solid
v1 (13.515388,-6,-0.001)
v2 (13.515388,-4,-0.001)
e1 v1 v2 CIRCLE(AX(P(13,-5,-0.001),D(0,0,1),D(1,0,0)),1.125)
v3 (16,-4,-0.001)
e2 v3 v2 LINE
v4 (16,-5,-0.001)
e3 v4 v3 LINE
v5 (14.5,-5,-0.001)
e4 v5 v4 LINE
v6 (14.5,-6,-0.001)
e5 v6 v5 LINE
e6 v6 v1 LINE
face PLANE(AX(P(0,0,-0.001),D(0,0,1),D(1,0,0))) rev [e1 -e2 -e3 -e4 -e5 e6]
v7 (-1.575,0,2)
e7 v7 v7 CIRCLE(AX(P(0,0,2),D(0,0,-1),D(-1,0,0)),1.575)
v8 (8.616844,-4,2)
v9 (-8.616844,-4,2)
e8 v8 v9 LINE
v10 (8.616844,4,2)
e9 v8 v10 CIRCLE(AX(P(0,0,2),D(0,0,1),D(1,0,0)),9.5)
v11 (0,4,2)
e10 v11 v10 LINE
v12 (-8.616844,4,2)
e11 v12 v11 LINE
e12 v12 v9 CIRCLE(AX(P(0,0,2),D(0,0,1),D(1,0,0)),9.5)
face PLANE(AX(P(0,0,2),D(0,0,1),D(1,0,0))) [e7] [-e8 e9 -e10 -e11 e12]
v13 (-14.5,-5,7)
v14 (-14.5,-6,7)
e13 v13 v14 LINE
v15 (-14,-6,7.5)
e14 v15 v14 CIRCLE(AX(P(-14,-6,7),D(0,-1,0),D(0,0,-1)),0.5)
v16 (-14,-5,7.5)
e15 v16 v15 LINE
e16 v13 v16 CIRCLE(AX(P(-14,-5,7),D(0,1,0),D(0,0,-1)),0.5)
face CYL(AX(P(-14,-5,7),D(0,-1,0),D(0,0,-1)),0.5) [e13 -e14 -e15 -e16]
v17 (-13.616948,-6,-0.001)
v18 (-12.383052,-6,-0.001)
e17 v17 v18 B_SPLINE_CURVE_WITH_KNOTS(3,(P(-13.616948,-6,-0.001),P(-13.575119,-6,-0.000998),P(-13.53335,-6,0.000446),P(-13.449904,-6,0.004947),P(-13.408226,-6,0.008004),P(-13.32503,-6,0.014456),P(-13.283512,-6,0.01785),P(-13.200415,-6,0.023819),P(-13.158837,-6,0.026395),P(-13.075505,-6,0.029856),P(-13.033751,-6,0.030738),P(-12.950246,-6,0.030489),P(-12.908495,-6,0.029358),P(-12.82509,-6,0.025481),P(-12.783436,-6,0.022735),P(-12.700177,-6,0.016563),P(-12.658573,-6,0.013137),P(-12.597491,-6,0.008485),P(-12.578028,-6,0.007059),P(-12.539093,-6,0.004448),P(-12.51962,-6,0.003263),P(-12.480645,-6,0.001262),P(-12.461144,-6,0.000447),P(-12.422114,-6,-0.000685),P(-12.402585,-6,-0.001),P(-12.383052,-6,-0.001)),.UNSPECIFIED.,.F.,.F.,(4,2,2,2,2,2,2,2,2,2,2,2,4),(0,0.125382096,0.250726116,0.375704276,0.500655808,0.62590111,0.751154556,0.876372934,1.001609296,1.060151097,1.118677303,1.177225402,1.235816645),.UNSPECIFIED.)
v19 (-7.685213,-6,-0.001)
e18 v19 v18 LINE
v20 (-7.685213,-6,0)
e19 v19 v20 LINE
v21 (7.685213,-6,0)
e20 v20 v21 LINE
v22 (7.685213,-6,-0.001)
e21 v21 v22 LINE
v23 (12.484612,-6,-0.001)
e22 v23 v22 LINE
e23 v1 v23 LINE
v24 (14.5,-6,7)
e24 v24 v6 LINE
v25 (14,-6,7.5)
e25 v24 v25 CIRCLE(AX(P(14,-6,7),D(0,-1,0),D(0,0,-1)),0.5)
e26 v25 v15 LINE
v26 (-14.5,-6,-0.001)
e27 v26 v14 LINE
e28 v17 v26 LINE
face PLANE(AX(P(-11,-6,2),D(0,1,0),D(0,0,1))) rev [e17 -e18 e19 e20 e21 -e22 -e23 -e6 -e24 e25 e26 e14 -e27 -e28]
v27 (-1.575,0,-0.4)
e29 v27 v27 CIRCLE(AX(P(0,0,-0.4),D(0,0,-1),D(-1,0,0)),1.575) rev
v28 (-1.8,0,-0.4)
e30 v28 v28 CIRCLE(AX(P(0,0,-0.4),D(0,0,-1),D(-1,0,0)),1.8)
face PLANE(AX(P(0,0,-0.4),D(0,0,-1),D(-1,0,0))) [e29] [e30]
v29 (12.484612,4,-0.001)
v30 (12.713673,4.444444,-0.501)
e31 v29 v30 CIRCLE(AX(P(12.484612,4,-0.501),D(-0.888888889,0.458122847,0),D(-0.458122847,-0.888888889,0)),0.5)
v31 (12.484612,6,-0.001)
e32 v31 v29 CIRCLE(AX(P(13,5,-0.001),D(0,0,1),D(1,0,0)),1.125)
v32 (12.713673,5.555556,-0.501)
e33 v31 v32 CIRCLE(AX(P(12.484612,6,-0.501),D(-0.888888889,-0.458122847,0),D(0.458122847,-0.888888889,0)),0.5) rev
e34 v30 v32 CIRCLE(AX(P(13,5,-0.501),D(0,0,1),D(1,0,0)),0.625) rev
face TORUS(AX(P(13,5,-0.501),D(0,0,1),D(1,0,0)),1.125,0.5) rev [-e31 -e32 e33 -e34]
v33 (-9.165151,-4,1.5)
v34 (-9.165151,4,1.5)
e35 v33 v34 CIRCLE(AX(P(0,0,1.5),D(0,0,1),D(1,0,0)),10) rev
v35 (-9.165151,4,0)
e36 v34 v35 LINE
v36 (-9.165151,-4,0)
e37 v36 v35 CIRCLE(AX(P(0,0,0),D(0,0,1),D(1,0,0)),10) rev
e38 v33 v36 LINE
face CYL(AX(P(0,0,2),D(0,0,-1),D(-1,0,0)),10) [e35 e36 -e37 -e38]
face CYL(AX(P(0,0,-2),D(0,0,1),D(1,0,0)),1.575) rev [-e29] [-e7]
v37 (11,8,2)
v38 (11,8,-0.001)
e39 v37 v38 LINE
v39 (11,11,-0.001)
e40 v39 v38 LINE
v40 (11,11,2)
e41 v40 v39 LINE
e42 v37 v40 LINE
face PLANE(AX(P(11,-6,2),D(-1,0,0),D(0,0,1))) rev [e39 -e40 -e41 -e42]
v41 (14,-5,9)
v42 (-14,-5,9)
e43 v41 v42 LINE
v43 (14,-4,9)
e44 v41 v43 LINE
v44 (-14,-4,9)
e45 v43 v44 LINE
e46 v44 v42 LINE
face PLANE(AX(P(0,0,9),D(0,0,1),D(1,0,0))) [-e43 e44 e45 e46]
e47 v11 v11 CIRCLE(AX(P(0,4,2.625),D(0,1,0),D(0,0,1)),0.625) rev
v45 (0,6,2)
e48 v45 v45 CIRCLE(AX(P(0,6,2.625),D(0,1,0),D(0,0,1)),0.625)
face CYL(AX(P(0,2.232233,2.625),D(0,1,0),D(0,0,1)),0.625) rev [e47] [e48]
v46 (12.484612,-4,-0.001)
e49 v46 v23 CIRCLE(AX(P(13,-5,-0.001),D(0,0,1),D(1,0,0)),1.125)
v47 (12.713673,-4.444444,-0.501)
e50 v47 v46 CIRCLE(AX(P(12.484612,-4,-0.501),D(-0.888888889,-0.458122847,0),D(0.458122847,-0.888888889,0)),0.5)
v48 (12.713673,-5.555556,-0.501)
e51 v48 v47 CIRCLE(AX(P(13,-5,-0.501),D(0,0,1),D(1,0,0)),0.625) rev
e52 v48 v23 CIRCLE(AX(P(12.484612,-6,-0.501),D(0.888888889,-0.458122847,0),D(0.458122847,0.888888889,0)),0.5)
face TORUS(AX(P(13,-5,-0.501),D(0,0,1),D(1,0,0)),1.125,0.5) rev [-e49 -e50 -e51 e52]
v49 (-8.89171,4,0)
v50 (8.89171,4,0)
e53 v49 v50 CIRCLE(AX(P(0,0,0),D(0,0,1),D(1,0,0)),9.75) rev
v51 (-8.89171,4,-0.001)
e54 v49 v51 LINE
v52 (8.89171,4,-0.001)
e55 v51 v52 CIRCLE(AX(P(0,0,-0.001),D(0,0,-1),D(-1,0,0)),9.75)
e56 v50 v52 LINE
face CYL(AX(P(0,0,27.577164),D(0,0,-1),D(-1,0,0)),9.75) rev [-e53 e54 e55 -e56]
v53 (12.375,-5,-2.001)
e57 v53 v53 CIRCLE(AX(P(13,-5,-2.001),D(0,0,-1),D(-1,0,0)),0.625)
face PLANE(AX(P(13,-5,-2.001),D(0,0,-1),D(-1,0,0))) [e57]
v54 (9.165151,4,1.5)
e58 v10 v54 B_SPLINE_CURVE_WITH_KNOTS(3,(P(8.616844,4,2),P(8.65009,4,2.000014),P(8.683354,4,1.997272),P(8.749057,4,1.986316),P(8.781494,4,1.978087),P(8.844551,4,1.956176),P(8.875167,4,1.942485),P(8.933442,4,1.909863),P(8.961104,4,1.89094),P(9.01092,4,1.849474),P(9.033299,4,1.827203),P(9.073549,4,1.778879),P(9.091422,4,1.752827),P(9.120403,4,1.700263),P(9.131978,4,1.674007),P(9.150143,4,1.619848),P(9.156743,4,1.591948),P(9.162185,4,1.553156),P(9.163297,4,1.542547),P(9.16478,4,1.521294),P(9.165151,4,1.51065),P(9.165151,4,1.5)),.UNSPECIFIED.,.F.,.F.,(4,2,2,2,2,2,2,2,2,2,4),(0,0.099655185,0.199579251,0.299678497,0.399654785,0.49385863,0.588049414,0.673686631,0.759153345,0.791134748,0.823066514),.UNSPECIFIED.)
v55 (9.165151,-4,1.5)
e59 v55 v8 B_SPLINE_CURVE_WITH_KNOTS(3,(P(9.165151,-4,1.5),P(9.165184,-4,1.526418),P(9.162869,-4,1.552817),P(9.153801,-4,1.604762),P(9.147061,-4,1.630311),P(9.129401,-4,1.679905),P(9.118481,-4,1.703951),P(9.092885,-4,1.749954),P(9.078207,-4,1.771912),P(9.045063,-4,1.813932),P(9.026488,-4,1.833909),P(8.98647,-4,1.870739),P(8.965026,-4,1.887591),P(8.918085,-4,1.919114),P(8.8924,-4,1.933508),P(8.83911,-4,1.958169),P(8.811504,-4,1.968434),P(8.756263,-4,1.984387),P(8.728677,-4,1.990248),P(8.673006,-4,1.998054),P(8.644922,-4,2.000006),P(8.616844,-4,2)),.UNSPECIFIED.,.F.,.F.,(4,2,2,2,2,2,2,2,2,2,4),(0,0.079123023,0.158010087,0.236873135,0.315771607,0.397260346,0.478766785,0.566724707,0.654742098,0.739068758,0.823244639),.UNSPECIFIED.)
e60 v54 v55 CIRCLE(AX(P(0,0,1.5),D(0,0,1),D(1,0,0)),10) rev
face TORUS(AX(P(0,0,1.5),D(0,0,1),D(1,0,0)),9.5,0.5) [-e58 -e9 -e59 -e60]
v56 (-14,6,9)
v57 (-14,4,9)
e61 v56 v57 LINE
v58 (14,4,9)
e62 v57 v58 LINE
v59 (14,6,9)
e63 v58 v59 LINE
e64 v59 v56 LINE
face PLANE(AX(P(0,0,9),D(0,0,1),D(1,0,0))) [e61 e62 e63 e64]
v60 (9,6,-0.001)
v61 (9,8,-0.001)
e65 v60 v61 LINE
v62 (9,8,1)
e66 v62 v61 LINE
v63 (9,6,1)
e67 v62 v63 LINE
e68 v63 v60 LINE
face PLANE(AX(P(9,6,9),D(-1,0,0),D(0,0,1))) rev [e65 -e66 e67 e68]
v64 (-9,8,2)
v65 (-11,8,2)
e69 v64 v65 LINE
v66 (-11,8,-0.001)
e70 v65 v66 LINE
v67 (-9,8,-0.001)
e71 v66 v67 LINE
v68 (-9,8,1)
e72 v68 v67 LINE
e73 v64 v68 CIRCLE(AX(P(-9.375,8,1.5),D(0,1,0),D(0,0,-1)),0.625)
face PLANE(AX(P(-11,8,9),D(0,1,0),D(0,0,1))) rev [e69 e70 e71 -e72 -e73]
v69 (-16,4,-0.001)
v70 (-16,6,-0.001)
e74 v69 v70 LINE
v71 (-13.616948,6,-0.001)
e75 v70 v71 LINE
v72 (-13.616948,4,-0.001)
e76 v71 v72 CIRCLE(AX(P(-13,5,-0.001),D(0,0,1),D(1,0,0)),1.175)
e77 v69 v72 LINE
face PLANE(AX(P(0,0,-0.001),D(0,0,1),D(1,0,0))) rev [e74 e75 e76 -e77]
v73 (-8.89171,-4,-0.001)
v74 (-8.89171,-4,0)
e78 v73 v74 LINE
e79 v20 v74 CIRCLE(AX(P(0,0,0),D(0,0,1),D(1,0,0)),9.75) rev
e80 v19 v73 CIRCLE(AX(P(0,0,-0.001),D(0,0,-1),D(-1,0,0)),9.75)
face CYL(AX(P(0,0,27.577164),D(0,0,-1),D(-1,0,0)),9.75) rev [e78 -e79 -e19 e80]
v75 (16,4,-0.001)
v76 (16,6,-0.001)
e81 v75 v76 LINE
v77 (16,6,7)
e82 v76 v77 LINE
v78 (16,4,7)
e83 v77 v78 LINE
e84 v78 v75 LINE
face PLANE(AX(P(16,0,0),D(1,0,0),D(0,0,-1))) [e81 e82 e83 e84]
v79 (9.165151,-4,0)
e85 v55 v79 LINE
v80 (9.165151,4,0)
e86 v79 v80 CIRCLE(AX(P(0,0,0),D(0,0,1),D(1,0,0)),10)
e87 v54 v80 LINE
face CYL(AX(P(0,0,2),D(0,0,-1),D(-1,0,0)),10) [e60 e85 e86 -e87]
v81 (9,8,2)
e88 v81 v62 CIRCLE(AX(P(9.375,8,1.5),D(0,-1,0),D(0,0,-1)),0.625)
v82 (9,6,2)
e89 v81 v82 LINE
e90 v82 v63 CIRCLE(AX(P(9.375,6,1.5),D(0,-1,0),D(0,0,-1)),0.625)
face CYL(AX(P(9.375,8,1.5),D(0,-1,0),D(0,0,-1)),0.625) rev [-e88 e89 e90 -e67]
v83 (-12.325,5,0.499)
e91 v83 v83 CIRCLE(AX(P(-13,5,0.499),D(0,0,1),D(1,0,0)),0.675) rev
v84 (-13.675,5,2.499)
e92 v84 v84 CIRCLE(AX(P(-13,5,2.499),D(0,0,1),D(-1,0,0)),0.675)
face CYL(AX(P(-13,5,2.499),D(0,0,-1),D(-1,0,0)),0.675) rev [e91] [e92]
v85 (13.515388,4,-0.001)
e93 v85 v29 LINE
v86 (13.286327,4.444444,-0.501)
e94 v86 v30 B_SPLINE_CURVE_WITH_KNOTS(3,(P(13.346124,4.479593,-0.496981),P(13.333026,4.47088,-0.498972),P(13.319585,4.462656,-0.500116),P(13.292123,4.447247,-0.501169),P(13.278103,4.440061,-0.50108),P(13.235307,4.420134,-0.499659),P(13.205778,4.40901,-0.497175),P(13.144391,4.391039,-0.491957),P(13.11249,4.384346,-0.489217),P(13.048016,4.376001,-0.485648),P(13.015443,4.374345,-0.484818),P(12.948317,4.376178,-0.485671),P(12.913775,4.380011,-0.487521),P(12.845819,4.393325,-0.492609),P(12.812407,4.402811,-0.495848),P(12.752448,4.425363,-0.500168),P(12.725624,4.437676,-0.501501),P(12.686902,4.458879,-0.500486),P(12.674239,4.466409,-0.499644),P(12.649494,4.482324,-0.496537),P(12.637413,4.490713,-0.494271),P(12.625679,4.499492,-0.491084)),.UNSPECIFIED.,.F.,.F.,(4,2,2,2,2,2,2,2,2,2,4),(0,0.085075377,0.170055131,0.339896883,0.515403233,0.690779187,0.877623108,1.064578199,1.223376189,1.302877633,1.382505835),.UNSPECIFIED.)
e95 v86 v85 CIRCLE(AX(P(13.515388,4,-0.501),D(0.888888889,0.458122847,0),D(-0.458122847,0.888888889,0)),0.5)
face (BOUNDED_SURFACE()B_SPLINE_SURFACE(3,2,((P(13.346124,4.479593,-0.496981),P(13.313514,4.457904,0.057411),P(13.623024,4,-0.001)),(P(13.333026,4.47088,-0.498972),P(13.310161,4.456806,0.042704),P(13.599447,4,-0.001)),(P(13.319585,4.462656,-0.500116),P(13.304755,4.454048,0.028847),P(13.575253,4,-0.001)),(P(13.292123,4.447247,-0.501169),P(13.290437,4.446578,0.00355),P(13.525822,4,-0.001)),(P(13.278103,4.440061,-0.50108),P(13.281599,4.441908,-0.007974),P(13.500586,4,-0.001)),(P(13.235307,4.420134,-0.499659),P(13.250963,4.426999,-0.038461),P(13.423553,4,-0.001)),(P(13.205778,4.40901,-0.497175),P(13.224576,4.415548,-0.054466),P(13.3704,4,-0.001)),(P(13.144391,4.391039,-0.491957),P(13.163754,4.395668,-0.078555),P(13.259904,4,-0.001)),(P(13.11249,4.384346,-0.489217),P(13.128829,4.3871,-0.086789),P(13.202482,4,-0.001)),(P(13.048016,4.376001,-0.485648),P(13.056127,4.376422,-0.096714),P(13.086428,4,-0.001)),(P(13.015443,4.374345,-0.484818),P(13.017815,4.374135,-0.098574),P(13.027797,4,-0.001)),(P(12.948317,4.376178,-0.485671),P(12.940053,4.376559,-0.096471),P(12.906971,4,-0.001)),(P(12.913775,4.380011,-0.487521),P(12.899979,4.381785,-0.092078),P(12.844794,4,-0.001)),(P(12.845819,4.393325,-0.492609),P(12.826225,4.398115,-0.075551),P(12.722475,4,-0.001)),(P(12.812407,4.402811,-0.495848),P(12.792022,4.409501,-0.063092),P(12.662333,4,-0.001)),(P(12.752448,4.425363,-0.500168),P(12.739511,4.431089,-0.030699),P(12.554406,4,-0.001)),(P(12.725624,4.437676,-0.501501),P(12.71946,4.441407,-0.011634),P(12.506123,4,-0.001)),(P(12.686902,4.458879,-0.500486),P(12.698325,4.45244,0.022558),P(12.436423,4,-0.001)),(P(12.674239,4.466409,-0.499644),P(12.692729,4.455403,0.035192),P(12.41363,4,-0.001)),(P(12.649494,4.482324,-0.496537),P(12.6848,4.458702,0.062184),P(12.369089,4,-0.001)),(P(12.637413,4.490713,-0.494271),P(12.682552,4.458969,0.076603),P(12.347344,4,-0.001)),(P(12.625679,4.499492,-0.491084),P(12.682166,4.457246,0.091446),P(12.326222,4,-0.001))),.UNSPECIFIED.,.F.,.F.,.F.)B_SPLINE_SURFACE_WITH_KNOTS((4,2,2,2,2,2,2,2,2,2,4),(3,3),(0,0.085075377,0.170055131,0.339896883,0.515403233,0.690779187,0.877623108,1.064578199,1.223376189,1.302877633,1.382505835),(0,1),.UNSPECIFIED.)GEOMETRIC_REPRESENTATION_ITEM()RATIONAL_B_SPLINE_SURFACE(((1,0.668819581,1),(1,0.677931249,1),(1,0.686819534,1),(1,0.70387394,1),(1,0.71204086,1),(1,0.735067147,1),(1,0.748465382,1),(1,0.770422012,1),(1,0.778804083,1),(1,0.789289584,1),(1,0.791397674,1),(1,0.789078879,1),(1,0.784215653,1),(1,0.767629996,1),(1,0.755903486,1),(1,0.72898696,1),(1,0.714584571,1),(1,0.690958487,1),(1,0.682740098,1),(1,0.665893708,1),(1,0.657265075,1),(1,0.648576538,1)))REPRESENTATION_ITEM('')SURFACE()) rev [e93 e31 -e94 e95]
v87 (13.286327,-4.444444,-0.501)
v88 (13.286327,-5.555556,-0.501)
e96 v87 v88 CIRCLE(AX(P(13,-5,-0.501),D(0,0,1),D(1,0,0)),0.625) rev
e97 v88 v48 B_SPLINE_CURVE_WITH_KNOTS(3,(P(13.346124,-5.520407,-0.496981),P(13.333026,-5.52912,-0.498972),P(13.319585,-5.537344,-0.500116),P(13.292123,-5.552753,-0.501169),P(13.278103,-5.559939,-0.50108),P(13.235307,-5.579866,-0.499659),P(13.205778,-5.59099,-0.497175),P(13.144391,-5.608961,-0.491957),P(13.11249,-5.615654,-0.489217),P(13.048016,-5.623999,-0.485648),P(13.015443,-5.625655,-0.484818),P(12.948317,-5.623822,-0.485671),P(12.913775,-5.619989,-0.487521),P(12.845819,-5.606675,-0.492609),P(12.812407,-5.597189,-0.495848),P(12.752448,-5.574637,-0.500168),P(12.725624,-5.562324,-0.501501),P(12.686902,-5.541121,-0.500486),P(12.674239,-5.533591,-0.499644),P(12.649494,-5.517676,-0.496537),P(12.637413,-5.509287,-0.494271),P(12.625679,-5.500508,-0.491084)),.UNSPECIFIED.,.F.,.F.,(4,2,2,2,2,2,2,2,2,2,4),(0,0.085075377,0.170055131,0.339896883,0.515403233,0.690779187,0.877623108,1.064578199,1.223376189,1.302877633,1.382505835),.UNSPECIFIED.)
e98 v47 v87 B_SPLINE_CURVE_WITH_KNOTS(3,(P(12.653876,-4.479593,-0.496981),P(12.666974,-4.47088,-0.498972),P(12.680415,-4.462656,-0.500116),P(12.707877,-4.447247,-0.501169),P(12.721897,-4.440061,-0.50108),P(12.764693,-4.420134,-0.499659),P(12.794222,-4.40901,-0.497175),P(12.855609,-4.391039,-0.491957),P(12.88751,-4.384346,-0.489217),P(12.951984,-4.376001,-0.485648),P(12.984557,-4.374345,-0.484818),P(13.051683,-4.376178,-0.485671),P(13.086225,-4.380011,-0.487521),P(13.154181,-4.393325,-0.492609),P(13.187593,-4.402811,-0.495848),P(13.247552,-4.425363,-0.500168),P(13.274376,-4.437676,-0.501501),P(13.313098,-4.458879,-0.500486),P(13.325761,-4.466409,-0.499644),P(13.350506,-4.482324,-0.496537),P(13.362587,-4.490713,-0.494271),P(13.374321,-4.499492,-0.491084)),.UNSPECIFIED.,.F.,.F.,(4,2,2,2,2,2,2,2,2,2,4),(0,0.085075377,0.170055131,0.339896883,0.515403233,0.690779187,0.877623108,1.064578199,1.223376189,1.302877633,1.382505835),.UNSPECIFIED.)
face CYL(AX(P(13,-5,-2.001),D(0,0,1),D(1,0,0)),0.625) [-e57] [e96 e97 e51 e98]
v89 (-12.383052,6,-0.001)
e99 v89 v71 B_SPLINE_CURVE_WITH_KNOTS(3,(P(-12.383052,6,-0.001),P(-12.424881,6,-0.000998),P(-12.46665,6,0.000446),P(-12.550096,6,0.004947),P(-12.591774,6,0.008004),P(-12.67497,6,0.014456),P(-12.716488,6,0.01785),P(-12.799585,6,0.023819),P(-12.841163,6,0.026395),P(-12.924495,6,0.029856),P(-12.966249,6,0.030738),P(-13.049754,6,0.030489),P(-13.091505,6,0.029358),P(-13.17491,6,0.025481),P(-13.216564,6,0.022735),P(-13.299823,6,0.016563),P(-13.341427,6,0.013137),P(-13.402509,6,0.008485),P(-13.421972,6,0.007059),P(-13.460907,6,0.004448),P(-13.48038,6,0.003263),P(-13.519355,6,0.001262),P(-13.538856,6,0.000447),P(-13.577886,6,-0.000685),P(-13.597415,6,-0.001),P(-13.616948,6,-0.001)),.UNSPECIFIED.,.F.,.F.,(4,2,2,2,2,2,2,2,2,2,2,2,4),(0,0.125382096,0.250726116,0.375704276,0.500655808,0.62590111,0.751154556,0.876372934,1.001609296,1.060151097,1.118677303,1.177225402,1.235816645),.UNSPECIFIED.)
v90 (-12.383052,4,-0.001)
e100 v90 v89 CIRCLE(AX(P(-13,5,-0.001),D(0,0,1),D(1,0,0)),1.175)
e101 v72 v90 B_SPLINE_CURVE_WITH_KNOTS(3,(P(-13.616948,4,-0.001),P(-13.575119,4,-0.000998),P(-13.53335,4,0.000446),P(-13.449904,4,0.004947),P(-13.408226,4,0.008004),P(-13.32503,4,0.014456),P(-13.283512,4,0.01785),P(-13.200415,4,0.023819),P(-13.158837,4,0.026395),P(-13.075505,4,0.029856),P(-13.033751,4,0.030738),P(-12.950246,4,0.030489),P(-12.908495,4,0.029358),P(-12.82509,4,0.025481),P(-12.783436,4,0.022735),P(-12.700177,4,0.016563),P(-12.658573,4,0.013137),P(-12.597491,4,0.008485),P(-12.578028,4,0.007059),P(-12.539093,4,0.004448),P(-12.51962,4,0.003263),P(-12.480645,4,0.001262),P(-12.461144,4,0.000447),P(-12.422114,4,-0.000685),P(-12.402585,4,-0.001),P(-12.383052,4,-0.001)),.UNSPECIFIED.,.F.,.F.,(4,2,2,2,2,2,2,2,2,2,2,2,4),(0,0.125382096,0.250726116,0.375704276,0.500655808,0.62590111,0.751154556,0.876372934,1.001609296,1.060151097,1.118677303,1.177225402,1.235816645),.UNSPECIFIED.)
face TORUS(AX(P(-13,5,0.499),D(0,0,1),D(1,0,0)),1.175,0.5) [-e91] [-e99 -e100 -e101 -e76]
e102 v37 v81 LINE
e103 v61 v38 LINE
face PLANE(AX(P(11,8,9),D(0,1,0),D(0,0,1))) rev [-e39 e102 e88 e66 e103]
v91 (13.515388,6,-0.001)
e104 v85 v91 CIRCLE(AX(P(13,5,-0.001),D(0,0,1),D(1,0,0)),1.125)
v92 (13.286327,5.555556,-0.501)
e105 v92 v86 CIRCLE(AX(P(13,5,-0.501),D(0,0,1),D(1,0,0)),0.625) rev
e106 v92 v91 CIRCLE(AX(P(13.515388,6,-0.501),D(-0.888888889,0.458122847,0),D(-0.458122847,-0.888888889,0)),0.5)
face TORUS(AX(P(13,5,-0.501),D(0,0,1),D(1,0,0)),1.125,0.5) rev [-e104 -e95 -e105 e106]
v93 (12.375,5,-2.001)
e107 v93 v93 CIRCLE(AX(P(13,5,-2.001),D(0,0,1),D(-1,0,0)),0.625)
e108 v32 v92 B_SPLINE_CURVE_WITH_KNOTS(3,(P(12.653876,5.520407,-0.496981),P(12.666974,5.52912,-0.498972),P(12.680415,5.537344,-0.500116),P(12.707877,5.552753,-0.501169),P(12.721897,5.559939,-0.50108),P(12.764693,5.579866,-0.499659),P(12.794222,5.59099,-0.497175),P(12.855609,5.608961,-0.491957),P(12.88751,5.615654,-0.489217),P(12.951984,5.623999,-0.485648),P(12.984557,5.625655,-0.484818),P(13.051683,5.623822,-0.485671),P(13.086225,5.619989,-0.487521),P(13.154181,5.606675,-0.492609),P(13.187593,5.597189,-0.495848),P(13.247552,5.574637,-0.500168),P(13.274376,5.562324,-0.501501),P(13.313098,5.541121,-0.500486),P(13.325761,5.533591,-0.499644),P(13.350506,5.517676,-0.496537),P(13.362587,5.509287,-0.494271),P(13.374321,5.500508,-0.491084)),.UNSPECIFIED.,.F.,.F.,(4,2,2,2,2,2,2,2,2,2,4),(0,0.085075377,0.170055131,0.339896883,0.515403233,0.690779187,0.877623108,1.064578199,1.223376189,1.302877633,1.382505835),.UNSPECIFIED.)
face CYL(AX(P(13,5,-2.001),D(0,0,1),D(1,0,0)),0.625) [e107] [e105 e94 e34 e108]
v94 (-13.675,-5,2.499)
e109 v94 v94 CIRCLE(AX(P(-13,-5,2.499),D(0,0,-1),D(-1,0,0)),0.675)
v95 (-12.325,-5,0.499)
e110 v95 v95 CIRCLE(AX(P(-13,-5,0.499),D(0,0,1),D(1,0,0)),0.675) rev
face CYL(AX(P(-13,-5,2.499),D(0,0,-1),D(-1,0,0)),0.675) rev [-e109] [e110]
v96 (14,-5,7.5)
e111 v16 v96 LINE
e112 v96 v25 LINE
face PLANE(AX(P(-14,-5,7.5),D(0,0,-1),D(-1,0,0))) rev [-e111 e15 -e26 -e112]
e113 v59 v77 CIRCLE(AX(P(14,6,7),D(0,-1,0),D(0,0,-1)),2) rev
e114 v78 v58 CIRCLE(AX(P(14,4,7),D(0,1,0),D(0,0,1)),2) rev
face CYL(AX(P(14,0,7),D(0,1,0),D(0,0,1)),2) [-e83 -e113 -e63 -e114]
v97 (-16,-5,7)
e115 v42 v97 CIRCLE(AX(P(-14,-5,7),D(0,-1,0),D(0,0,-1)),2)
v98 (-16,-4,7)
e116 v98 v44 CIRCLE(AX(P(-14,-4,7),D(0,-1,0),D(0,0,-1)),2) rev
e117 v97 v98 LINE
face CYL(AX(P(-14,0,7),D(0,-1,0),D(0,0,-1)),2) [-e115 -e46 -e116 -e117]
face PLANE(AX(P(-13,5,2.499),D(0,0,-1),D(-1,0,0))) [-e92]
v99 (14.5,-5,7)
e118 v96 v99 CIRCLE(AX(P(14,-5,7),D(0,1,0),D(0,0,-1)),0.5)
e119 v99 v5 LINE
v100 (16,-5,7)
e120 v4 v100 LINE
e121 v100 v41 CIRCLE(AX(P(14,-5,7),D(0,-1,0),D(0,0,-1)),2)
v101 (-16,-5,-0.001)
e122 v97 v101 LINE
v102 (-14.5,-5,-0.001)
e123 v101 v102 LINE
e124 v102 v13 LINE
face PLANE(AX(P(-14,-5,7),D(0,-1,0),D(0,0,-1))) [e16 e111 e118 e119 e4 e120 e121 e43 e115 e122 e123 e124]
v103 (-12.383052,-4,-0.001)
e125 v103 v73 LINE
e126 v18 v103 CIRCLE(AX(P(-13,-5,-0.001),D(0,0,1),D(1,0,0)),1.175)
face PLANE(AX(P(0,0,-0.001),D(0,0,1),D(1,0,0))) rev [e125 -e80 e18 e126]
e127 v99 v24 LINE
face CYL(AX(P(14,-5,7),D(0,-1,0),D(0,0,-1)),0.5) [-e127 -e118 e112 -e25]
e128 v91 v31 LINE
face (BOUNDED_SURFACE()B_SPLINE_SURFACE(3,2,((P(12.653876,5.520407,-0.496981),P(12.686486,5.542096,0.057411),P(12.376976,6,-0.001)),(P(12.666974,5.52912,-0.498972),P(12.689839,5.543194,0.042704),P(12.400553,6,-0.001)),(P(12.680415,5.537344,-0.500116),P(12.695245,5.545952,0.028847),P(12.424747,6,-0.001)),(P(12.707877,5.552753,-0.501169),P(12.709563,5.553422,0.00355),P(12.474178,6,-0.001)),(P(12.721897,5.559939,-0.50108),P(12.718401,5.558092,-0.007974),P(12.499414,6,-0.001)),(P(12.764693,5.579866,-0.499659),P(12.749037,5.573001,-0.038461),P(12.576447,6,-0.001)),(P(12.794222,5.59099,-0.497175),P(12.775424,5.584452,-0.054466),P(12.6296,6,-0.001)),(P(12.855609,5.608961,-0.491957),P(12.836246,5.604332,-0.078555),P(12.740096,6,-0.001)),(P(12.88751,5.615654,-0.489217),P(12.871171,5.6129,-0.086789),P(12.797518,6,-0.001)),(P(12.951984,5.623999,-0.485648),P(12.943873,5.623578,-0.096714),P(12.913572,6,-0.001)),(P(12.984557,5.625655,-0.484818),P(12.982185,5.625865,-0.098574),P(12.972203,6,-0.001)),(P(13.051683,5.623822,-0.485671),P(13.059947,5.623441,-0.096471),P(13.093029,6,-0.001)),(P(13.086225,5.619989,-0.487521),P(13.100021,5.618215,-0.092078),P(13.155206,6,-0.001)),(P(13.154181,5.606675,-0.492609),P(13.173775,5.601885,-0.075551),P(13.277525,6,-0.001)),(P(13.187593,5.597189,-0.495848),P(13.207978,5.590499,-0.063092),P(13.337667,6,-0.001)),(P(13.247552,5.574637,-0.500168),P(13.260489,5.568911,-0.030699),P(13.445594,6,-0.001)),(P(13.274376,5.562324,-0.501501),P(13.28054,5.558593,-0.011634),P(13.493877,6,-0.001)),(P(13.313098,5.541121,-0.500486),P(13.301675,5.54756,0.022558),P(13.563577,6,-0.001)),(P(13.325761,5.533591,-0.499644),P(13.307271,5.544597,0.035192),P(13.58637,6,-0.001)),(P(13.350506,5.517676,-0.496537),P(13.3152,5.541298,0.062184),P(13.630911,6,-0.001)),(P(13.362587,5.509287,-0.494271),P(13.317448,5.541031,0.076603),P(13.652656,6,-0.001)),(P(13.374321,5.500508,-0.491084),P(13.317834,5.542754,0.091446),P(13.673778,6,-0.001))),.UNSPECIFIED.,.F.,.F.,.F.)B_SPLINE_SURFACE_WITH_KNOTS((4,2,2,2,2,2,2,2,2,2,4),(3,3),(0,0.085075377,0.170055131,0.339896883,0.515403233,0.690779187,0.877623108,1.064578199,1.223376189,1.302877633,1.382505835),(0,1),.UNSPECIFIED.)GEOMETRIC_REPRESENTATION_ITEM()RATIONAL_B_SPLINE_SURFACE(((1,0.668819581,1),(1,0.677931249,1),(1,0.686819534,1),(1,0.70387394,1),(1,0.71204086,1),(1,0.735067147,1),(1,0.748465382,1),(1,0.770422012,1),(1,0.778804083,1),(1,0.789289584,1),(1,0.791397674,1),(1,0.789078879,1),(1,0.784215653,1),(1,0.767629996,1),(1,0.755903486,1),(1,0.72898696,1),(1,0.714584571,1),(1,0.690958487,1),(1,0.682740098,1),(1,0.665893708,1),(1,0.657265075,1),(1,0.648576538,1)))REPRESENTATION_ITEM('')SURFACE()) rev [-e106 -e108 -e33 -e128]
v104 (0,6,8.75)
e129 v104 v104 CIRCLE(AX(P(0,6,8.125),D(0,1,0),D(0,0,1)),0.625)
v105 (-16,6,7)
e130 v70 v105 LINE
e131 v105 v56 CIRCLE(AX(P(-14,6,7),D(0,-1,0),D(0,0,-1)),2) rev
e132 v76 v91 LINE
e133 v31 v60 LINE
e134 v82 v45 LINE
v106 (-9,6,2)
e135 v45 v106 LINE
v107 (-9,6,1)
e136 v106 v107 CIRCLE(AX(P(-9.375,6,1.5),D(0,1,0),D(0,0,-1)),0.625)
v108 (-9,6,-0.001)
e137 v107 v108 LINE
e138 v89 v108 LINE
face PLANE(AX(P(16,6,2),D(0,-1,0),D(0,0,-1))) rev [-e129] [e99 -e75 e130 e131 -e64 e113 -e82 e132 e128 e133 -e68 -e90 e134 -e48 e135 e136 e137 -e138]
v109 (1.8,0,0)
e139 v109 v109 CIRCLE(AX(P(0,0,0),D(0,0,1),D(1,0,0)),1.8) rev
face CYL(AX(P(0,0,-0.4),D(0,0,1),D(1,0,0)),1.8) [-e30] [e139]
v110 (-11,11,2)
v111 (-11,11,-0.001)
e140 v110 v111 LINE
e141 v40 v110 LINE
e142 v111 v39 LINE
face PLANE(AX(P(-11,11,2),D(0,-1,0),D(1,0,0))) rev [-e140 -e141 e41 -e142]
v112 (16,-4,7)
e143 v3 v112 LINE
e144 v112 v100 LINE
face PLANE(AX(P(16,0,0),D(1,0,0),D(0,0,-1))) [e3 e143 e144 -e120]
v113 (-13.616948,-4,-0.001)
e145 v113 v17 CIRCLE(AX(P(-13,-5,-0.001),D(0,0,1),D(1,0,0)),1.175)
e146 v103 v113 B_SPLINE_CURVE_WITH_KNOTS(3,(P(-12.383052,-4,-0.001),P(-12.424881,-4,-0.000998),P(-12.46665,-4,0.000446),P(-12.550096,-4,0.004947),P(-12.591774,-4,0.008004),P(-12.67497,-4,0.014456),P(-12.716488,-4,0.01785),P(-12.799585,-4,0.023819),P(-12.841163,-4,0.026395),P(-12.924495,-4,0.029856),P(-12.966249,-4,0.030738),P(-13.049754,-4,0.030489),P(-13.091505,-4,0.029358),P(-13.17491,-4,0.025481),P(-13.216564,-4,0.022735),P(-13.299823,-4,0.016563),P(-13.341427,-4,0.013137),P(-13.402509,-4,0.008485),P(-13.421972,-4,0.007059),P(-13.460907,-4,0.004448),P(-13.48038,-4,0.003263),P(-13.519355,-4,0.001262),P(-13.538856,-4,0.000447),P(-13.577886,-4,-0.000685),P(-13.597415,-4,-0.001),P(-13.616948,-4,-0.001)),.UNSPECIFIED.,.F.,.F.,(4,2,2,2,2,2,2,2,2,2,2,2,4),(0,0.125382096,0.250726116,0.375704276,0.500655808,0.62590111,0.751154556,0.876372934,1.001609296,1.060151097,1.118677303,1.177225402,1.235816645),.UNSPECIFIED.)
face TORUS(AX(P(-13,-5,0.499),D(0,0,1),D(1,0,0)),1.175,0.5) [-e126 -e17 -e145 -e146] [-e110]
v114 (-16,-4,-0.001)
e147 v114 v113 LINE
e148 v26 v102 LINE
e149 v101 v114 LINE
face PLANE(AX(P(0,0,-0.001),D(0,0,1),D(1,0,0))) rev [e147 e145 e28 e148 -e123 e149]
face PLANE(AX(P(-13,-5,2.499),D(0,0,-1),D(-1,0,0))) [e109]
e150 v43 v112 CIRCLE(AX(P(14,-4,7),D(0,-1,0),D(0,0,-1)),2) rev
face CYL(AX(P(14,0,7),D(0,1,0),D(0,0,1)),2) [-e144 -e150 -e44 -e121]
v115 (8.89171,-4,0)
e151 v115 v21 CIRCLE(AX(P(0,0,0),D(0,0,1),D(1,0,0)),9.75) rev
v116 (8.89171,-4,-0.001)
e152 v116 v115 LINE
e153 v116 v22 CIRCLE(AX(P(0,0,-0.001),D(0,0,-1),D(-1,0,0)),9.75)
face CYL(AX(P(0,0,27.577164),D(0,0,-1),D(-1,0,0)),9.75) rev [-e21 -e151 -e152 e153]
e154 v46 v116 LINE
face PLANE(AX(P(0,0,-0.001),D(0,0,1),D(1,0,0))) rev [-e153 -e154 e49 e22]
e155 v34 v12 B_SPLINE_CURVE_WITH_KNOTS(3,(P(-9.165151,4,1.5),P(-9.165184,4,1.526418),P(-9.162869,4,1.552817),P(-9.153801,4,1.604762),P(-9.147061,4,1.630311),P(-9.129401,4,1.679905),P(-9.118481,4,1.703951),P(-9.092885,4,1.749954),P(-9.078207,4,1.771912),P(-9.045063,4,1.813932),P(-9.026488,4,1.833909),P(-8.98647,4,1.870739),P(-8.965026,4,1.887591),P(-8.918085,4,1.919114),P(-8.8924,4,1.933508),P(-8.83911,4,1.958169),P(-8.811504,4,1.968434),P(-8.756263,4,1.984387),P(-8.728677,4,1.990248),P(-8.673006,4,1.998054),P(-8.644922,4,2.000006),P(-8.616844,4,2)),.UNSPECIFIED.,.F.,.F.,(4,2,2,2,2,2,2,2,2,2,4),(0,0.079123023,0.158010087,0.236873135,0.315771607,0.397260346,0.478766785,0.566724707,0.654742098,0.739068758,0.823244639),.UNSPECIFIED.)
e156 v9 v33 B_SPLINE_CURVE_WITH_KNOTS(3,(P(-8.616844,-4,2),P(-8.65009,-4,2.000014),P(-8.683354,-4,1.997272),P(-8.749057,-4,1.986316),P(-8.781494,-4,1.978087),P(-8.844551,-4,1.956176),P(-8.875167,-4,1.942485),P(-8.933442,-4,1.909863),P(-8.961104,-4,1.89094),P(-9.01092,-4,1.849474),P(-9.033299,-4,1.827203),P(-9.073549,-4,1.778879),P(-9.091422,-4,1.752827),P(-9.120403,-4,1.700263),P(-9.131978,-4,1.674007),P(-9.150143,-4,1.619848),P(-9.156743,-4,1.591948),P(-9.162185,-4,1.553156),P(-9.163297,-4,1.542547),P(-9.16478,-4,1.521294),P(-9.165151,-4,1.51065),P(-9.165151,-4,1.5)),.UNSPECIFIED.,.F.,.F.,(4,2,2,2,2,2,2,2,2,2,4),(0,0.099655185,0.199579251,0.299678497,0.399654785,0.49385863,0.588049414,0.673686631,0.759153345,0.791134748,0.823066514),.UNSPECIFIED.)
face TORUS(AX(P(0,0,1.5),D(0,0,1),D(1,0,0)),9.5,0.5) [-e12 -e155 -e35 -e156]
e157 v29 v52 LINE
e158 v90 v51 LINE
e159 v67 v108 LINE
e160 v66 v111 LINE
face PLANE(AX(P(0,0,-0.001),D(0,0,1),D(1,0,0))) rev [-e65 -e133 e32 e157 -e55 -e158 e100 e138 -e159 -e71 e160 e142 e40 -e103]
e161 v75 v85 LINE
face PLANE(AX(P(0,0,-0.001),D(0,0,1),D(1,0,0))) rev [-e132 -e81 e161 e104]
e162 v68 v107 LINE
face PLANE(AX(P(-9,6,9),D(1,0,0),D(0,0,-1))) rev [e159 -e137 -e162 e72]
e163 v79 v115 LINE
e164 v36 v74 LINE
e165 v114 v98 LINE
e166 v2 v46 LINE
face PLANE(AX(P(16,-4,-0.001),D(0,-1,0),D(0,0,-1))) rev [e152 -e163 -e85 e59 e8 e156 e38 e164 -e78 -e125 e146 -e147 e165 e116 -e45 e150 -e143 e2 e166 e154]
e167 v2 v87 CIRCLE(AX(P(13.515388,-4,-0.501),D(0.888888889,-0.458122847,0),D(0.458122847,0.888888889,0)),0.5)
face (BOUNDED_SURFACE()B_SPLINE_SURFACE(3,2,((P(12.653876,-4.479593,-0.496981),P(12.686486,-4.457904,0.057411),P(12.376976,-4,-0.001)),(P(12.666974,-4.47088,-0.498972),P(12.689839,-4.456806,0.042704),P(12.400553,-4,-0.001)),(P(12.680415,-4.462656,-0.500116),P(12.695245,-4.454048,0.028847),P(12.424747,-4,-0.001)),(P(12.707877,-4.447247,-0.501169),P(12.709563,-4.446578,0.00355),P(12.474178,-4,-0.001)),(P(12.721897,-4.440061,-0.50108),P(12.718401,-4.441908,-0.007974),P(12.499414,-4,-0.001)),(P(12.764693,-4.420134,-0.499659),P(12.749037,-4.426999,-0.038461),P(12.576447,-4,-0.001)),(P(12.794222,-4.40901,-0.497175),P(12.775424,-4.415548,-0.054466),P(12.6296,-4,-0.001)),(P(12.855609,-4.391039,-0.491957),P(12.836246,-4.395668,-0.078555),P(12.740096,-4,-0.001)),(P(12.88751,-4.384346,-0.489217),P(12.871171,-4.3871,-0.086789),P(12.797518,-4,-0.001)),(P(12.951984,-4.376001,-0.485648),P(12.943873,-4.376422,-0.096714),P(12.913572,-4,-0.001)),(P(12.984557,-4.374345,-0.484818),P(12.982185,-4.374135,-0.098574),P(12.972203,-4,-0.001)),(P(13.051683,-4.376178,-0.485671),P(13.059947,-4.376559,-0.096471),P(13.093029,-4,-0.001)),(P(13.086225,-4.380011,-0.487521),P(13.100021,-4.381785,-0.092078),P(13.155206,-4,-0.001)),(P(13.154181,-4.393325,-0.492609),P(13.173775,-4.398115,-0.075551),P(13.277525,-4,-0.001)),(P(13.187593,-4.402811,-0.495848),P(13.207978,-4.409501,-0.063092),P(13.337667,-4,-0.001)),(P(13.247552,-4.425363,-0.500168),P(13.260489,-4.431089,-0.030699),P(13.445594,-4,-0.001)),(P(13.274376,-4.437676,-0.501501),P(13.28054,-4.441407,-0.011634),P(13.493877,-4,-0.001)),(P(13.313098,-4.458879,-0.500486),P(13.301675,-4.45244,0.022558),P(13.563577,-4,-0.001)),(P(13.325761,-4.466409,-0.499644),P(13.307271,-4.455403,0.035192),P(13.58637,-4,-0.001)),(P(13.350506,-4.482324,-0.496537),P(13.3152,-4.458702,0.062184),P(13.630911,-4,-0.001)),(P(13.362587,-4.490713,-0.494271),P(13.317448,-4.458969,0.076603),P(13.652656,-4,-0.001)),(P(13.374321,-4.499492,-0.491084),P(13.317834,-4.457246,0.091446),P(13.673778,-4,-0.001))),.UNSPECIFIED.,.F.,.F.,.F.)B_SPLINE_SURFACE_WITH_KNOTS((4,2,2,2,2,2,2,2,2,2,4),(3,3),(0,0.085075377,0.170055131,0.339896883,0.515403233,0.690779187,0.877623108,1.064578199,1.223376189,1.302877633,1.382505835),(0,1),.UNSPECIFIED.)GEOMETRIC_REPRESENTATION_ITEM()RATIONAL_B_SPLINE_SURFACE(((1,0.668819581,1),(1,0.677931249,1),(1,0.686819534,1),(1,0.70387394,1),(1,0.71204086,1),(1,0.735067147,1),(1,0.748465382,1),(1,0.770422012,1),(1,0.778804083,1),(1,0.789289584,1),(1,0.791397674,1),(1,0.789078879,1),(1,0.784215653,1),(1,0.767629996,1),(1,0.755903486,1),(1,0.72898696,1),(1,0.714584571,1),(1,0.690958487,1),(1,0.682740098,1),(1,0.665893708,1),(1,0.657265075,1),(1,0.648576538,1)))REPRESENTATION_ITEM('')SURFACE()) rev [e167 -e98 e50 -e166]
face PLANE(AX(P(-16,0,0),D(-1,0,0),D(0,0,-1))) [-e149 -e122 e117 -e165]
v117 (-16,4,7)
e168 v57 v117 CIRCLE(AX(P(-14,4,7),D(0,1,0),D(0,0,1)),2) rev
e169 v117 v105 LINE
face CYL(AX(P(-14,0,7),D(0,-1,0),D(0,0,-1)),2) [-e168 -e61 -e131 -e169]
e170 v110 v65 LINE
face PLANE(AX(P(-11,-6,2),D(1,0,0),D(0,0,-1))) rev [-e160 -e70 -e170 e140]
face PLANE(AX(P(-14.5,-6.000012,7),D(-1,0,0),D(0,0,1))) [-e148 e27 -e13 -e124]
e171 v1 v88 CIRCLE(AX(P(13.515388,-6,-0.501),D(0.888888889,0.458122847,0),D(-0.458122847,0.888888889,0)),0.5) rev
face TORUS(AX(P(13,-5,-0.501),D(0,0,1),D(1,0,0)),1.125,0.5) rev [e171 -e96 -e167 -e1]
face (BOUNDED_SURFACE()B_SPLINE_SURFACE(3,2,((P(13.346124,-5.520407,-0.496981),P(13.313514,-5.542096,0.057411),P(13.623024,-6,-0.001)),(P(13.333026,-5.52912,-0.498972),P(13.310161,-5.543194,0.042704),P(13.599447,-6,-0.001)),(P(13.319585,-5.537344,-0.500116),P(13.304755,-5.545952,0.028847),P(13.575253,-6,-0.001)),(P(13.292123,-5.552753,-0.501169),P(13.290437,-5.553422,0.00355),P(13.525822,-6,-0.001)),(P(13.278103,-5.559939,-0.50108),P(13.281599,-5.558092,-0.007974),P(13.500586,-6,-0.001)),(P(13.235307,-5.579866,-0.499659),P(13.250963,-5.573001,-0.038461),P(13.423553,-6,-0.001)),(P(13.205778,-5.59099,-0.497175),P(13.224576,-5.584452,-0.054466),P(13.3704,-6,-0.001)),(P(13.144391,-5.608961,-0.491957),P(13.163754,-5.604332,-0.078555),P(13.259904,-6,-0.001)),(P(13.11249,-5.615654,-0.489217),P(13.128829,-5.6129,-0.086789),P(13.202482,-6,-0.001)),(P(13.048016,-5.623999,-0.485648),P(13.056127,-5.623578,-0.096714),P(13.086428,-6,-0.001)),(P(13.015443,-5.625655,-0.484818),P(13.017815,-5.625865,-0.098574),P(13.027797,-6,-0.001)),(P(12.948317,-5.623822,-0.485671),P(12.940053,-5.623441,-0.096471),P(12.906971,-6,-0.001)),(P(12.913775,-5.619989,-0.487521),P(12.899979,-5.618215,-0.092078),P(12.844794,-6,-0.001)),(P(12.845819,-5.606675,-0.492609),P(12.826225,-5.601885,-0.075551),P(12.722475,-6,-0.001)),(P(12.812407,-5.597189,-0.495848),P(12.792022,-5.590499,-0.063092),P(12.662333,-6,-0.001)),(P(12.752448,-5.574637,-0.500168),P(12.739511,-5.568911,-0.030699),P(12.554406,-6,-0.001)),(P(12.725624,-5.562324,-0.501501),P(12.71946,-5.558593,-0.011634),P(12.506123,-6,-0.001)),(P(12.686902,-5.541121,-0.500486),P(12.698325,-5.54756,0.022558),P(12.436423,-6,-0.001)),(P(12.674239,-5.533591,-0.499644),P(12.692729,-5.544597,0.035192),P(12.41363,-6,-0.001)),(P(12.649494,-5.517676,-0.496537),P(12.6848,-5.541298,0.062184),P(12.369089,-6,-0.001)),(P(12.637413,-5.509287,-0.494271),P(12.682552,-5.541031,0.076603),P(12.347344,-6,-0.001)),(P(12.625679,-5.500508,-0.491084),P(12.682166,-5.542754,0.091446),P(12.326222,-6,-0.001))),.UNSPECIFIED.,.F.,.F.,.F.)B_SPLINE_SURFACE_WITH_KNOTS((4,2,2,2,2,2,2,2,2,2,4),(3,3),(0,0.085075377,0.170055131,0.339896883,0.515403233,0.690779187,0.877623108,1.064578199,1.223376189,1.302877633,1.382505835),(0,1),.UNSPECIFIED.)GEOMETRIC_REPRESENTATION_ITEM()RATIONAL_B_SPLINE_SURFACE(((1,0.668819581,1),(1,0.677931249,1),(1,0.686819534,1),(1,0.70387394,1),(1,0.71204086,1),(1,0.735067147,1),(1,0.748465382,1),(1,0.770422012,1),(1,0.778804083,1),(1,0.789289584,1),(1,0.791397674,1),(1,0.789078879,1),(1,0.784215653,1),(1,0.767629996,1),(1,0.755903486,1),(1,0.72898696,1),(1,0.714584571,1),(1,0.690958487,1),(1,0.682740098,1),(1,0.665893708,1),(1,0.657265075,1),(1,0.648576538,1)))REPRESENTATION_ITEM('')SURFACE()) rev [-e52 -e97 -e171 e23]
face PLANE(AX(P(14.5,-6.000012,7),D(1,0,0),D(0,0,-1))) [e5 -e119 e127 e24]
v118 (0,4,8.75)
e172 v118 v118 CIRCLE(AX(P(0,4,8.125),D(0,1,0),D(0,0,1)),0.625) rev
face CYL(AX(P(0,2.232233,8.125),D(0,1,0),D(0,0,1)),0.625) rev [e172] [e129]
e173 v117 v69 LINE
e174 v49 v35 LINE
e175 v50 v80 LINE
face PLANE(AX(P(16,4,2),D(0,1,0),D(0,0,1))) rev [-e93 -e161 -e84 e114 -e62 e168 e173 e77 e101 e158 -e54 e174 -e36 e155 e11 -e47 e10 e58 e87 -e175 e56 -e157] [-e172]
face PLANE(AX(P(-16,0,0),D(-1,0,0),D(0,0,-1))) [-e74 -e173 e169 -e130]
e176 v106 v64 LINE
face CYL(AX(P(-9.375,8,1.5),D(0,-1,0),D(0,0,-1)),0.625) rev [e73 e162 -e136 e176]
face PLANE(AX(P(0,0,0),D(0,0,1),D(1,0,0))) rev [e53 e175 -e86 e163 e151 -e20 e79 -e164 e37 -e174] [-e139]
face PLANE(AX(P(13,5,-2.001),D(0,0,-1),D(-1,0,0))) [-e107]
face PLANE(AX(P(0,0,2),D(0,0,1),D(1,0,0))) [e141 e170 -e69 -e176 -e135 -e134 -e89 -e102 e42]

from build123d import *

# Parameters (mm, degrees)
BOSS_EXTRUDE1_DEPTH     = 2
SKETCH2_R               = 1.575
BOSS_EXTRUDE2_DEPTH     = 4
SKETCH3_R               = 1.8
BOSS_EXTRUDE3_DEPTH     = 0.4
SKETCH4_W               = 2
SKETCH4_H               = 17
BOSS_EXTRUDE4_DEPTH     = 0.001
SKETCH5_W               = 18
SKETCH5_H               = 2
BOSS_EXTRUDE5_DEPTH     = 0.001
SKETCH6_W               = 2.001
SKETCH6_H               = 2
BOSS_EXTRUDE6_DEPTH     = 5
BOSS_EXTRUDE7_DEPTH     = 0.001
CUT_EXTRUDE1_DEPTH      = 20.519323784
SKETCH9_W               = 2.937742252
SKETCH9_H               = 8
CUT_EXTRUDE2_DEPTH      = 0.001
CUT_EXTRUDE11_START     = -0.001
SKETCH21_R              = 9.75
SKETCH21_R_2            = 1.8
CUT_EXTRUDE11_DEPTH     = 0.001
SKETCH10_W              = 32
SKETCH10_H              = 2
BOSS_EXTRUDE8_DEPTH     = 7
FILLET1_R               = 0.5
SKETCH11_R              = 0.625
BOSS_EXTRUDE9_DEPTH     = 2
SKETCH14_W              = 2
SKETCH14_H              = 2
CUT_EXTRUDE5_DEPTH      = 22.401355237
SKETCH12_R              = 0.675
CUT_EXTRUDE3_DEPTH      = 2.5
CUT_EXTRUDE6_DEPTH      = 2
FILLET2_R               = 0.5
FILLET3_R               = 0.5
FILLET4_R               = 2
CUT_EXTRUDE7_DEPTH      = 26.019992106
CUT_EXTRUDE7_DEPTH_BACK = 1
SKETCH19_R              = 0.625
CUT_EXTRUDE9_DEPTH      = 2


with BuildPart() as part:
    # Sketch1 → Boss-Extrude1 (new body)
    with BuildSketch(Plane.XY):
        Polygon((-11, 6), (-11, 11), (11, 11), (11, 6), (11, -6), (-11, -6), align=None)
    extrude(amount=BOSS_EXTRUDE1_DEPTH)

    # Sketch3 → Boss-Extrude3 (add)
    with BuildSketch(Plane(origin=(0, 0, 0), x_dir=(-1, 0, 0), z_dir=(0, 0, -1))):
        with Locations(Location((0, 0, 0), (0, 0, 180))):
            Circle(SKETCH3_R)
    extrude(amount=BOSS_EXTRUDE3_DEPTH)

    # Sketch4 → Boss-Extrude4 (add)
    with BuildSketch(Plane(origin=(0, 0, 0), x_dir=(-1, 0, 0), z_dir=(0, 0, -1))):
        with Locations((10, 2.5)):
            Rectangle(SKETCH4_W, SKETCH4_H)
        with Locations((-10, 2.5)):
            Rectangle(SKETCH4_W, SKETCH4_H)
    extrude(amount=BOSS_EXTRUDE4_DEPTH)

    # Sketch5 → Boss-Extrude5 (add)
    with BuildSketch(Plane(origin=(0, 0, 0), x_dir=(-1, 0, 0), z_dir=(0, 0, -1))):
        with Locations((0, 10)):
            Rectangle(SKETCH5_W, SKETCH5_H)
    extrude(amount=BOSS_EXTRUDE5_DEPTH)

    # Sketch6 → Boss-Extrude6 (add)
    with BuildSketch(Plane(origin=(11, 0, 0), x_dir=(0, 0, -1), z_dir=(1, 0, 0))):
        with Locations((-0.9995, -5)):
            Rectangle(SKETCH6_W, SKETCH6_H)
        with Locations((-0.9995, 5)):
            Rectangle(SKETCH6_W, SKETCH6_H)
    boss_extrude6 = extrude(amount=BOSS_EXTRUDE6_DEPTH)

    # Mirror1: Boss-Extrude6 across plane
    add(boss_extrude6.mirror(Plane(origin=(0, 0, 0), x_dir=(0, 0, 1), z_dir=(1, 0, 0))))

    # Sketch7 → Boss-Extrude7 (add)
    with BuildSketch(Plane(origin=(0, 0, -0.001), x_dir=(-1, 0, 0), z_dir=(0, 0, -1))):
        with BuildLine():
            ThreePointArc((-6.708203932, -6), (-8.407551231, -3.211398808), (-9, 0))
            Line((-9, 0), (-9, -6))
            Line((-9, -6), (-6.708203932, -6))
        make_face()
        with BuildLine():
            Line((-9, 9), (-9, 0))
            ThreePointArc((-9, 0), (-6.363961031, 6.363961031), (0, 9))
            Line((0, 9), (-9, 9))
        make_face()
    boss_extrude7 = extrude(amount=-BOSS_EXTRUDE7_DEPTH)

    # Sketch8 → Cut-Extrude1 (cut, through all)
    with BuildSketch(Plane(origin=(0, 0, -0.001), x_dir=(-1, 0, 0), z_dir=(0, 0, -1))):
        with BuildLine():
            Line((-11, 4), (-9.16515139, 4))
            ThreePointArc((-9.16515139, 4), (-10, 0), (-9.16515139, -4))
            Line((-9.16515139, -4), (-11, -4))
            Line((-11, -4), (-11, 4))
        make_face()
    cut_extrude1 = extrude(amount=-CUT_EXTRUDE1_DEPTH, mode=Mode.SUBTRACT)

    # Sketch9 → Cut-Extrude2 (cut)
    with BuildSketch(Plane(origin=(0, 0, -0.001), x_dir=(-1, 0, 0), z_dir=(0, 0, -1))):
        with Locations((-9.531128874, 0)):
            Rectangle(SKETCH9_W, SKETCH9_H)
    cut_extrude2 = extrude(amount=-CUT_EXTRUDE2_DEPTH, mode=Mode.SUBTRACT)

    # Mirror2: Boss-Extrude7, Cut-Extrude1, Cut-Extrude2 across plane
    add(boss_extrude7.mirror(Plane(origin=(0, 0, 0), x_dir=(0, 0, 1), z_dir=(1, 0, 0))))
    add(cut_extrude1.mirror(Plane(origin=(0, 0, 0), x_dir=(0, 0, 1), z_dir=(1, 0, 0))), mode=Mode.SUBTRACT)
    add(cut_extrude2.mirror(Plane(origin=(0, 0, 0), x_dir=(0, 0, 1), z_dir=(1, 0, 0))), mode=Mode.SUBTRACT)

    # Sketch21 → Cut-Extrude11 (cut)
    with BuildSketch(Plane(origin=(0, 0, -0.001), x_dir=(-1, 0, 0), z_dir=(0, 0, -1)).offset(CUT_EXTRUDE11_START)):
        Circle(SKETCH21_R)
        with Locations(Location((0, 0, 0), (0, 0, 180))):
            Circle(SKETCH21_R_2, mode=Mode.SUBTRACT)
    extrude(amount=CUT_EXTRUDE11_DEPTH, mode=Mode.SUBTRACT)

    # Sketch10 → Boss-Extrude8 (add)
    with BuildSketch(Plane.XY.offset(2)):
        with Locations((0, -5)):
            Rectangle(SKETCH10_W, SKETCH10_H)
        with Locations((0, 5)):
            Rectangle(SKETCH10_W, SKETCH10_H)
    extrude(amount=BOSS_EXTRUDE8_DEPTH)

    # Fillet1
    fillet1_edges = [part.edges().sort_by_distance(p)[0] for p in [
        (10, 0, 2),
        (-10, 0, 2),
    ]]
    fillet(fillet1_edges, radius=FILLET1_R)

    # Sketch11 → Boss-Extrude9 (add)
    with BuildSketch(Plane(origin=(0, 0, -0.001), x_dir=(-1, 0, 0), z_dir=(0, 0, -1))):
        with Locations(Location((-13, -5, 0), (0, 0, 180))):
            Circle(SKETCH11_R)
    boss_extrude9 = extrude(amount=BOSS_EXTRUDE9_DEPTH)

    # Sketch14 → Cut-Extrude5 (cut, through all)
    with BuildSketch(Plane(origin=(0, 0, -0.001), x_dir=(-1, 0, 0), z_dir=(0, 0, -1))):
        with Locations((10, 7)):
            Rectangle(SKETCH14_W, SKETCH14_H)
        with Locations((-10, 7)):
            Rectangle(SKETCH14_W, SKETCH14_H)
    extrude(amount=-CUT_EXTRUDE5_DEPTH, mode=Mode.SUBTRACT)

    # Sketch12 → Cut-Extrude3 (cut)
    with BuildSketch(Plane(origin=(0, 0, -0.001), x_dir=(-1, 0, 0), z_dir=(0, 0, -1))):
        with Locations((13, -5)):
            Circle(SKETCH12_R)
    cut_extrude3 = extrude(amount=-CUT_EXTRUDE3_DEPTH, mode=Mode.SUBTRACT)

    # Sketch16 → Cut-Extrude6 (cut)
    with BuildSketch(Plane(origin=(0, 6, 0), x_dir=(1, 0, 0), z_dir=(0, 1, 0))):
        with BuildLine():
            Line((-9, -1), (-9, -2))
            ThreePointArc((-9, -2), (-8.75, -1.5), (-9, -1))
        make_face()
    cut_extrude6 = extrude(amount=CUT_EXTRUDE6_DEPTH, mode=Mode.SUBTRACT)

    # Mirror3: Boss-Extrude9, Cut-Extrude3 across plane
    add(boss_extrude9.mirror(Plane.ZX))
    add(cut_extrude3.mirror(Plane.ZX), mode=Mode.SUBTRACT)

    # Mirror4: Cut-Extrude6 across plane
    add(cut_extrude6.mirror(Plane(origin=(0, 0, 0), x_dir=(0, 0, 1), z_dir=(1, 0, 0))), mode=Mode.SUBTRACT)

    # Fillet2
    fillet2_edges = [part.edges().sort_by_distance(p)[0] for p in [
        (12.375, -5, -0.001),
        (12.375, 5, -0.001),
    ]]
    fillet(fillet2_edges, radius=FILLET2_R)

    # Fillet3
    # the kernel refuses this fillet: 0.5 mm, written as the material it takes off along each edge
    with BuildSketch(Plane(origin=(-13, -5, -0.001), x_dir=(-1, 0, 0), z_dir=(0, -1, 0))) as fillet3_piece_1:
        with BuildLine():
            CenterArc((0.675 + FILLET3_R, -FILLET3_R), FILLET3_R, 90, 90)
            Line((0.675, -FILLET3_R), (0.675, 0))
            Line((0.675, 0), (0.675 + FILLET3_R, 0))
        make_face()
    revolve(axis=Axis((-13, -5, -0.001), (0, 0, -1)), mode=Mode.SUBTRACT)
    with BuildSketch(Plane(origin=(-13, 5, -0.001), x_dir=(-1, 0, 0), z_dir=(0, 1, 0))) as fillet3_piece_2:
        with BuildLine():
            CenterArc((0.675 + FILLET3_R, FILLET3_R), FILLET3_R, 180, 90)
            Line((0.675, FILLET3_R), (0.675, 0))
            Line((0.675, 0), (0.675 + FILLET3_R, 0))
        make_face()
    revolve(axis=Axis((-13, 5, -0.001), (0, 0, 1)), mode=Mode.SUBTRACT)

    # Fillet4
    fillet4_edges = [part.edges().sort_by_distance(p)[0] for p in [
        (16, -5, 9),
        (-16, -5, 9),
        (-16, 5, 9),
        (16, 5, 9),
    ]]
    fillet(fillet4_edges, radius=FILLET4_R)

    # Sketch17 → Cut-Extrude7 (cut, two sides: drawn at the far end of the back side and taken through both)
    with BuildSketch(Plane.XZ.offset(6).offset(-CUT_EXTRUDE7_DEPTH_BACK)):
        with BuildLine():
            Line((-16, 7), (-16, -0.001))
            Line((-16, -0.001), (-14.5, -0.001))
            Line((-14.5, -0.001), (-14.5, 7))
            ThreePointArc((-14.5, 7), (-14.353553391, 7.353553391), (-14, 7.5))
            Line((-14, 7.5), (14, 7.5))
            ThreePointArc((14, 7.5), (14.353553391, 7.353553391), (14.5, 7))
            Line((14.5, 7), (14.5, -0.001))
            Line((14.5, -0.001), (16, -0.001))
            Line((16, -0.001), (16, 7))
            ThreePointArc((16, 7), (15.414213562, 8.414213562), (14, 9))
            Line((14, 9), (-14, 9))
            ThreePointArc((-14, 9), (-15.414213562, 8.414213562), (-16, 7))
        make_face()
    extrude(amount=CUT_EXTRUDE7_DEPTH + CUT_EXTRUDE7_DEPTH_BACK, mode=Mode.SUBTRACT)

    # Sketch19 → Cut-Extrude9 (cut)
    with BuildSketch(Plane(origin=(0, 6, 0), x_dir=(1, 0, 0), z_dir=(0, 1, 0))):
        with Locations(Location((0, -2.625, 0), (0, 0, 90))):
            Circle(SKETCH19_R)
        with Locations(Location((0, -8.125, 0), (0, 0, 270))):
            Circle(SKETCH19_R)
    extrude(amount=-CUT_EXTRUDE9_DEPTH, mode=Mode.SUBTRACT)


with BuildPart() as body_2:
    # Sketch2 → Boss-Extrude2 (new body)
    with BuildSketch(Plane(origin=(0, 0, 2), x_dir=(-1, 0, 0), z_dir=(0, 0, -1))):
        Circle(SKETCH2_R)
    extrude(amount=BOSS_EXTRUDE2_DEPTH)


with BuildPart() as part_1:
    add(part.part)

    # Combine2: cut body 2
    add(body_2.part, mode=Mode.SUBTRACT)


solid = part_1.part
